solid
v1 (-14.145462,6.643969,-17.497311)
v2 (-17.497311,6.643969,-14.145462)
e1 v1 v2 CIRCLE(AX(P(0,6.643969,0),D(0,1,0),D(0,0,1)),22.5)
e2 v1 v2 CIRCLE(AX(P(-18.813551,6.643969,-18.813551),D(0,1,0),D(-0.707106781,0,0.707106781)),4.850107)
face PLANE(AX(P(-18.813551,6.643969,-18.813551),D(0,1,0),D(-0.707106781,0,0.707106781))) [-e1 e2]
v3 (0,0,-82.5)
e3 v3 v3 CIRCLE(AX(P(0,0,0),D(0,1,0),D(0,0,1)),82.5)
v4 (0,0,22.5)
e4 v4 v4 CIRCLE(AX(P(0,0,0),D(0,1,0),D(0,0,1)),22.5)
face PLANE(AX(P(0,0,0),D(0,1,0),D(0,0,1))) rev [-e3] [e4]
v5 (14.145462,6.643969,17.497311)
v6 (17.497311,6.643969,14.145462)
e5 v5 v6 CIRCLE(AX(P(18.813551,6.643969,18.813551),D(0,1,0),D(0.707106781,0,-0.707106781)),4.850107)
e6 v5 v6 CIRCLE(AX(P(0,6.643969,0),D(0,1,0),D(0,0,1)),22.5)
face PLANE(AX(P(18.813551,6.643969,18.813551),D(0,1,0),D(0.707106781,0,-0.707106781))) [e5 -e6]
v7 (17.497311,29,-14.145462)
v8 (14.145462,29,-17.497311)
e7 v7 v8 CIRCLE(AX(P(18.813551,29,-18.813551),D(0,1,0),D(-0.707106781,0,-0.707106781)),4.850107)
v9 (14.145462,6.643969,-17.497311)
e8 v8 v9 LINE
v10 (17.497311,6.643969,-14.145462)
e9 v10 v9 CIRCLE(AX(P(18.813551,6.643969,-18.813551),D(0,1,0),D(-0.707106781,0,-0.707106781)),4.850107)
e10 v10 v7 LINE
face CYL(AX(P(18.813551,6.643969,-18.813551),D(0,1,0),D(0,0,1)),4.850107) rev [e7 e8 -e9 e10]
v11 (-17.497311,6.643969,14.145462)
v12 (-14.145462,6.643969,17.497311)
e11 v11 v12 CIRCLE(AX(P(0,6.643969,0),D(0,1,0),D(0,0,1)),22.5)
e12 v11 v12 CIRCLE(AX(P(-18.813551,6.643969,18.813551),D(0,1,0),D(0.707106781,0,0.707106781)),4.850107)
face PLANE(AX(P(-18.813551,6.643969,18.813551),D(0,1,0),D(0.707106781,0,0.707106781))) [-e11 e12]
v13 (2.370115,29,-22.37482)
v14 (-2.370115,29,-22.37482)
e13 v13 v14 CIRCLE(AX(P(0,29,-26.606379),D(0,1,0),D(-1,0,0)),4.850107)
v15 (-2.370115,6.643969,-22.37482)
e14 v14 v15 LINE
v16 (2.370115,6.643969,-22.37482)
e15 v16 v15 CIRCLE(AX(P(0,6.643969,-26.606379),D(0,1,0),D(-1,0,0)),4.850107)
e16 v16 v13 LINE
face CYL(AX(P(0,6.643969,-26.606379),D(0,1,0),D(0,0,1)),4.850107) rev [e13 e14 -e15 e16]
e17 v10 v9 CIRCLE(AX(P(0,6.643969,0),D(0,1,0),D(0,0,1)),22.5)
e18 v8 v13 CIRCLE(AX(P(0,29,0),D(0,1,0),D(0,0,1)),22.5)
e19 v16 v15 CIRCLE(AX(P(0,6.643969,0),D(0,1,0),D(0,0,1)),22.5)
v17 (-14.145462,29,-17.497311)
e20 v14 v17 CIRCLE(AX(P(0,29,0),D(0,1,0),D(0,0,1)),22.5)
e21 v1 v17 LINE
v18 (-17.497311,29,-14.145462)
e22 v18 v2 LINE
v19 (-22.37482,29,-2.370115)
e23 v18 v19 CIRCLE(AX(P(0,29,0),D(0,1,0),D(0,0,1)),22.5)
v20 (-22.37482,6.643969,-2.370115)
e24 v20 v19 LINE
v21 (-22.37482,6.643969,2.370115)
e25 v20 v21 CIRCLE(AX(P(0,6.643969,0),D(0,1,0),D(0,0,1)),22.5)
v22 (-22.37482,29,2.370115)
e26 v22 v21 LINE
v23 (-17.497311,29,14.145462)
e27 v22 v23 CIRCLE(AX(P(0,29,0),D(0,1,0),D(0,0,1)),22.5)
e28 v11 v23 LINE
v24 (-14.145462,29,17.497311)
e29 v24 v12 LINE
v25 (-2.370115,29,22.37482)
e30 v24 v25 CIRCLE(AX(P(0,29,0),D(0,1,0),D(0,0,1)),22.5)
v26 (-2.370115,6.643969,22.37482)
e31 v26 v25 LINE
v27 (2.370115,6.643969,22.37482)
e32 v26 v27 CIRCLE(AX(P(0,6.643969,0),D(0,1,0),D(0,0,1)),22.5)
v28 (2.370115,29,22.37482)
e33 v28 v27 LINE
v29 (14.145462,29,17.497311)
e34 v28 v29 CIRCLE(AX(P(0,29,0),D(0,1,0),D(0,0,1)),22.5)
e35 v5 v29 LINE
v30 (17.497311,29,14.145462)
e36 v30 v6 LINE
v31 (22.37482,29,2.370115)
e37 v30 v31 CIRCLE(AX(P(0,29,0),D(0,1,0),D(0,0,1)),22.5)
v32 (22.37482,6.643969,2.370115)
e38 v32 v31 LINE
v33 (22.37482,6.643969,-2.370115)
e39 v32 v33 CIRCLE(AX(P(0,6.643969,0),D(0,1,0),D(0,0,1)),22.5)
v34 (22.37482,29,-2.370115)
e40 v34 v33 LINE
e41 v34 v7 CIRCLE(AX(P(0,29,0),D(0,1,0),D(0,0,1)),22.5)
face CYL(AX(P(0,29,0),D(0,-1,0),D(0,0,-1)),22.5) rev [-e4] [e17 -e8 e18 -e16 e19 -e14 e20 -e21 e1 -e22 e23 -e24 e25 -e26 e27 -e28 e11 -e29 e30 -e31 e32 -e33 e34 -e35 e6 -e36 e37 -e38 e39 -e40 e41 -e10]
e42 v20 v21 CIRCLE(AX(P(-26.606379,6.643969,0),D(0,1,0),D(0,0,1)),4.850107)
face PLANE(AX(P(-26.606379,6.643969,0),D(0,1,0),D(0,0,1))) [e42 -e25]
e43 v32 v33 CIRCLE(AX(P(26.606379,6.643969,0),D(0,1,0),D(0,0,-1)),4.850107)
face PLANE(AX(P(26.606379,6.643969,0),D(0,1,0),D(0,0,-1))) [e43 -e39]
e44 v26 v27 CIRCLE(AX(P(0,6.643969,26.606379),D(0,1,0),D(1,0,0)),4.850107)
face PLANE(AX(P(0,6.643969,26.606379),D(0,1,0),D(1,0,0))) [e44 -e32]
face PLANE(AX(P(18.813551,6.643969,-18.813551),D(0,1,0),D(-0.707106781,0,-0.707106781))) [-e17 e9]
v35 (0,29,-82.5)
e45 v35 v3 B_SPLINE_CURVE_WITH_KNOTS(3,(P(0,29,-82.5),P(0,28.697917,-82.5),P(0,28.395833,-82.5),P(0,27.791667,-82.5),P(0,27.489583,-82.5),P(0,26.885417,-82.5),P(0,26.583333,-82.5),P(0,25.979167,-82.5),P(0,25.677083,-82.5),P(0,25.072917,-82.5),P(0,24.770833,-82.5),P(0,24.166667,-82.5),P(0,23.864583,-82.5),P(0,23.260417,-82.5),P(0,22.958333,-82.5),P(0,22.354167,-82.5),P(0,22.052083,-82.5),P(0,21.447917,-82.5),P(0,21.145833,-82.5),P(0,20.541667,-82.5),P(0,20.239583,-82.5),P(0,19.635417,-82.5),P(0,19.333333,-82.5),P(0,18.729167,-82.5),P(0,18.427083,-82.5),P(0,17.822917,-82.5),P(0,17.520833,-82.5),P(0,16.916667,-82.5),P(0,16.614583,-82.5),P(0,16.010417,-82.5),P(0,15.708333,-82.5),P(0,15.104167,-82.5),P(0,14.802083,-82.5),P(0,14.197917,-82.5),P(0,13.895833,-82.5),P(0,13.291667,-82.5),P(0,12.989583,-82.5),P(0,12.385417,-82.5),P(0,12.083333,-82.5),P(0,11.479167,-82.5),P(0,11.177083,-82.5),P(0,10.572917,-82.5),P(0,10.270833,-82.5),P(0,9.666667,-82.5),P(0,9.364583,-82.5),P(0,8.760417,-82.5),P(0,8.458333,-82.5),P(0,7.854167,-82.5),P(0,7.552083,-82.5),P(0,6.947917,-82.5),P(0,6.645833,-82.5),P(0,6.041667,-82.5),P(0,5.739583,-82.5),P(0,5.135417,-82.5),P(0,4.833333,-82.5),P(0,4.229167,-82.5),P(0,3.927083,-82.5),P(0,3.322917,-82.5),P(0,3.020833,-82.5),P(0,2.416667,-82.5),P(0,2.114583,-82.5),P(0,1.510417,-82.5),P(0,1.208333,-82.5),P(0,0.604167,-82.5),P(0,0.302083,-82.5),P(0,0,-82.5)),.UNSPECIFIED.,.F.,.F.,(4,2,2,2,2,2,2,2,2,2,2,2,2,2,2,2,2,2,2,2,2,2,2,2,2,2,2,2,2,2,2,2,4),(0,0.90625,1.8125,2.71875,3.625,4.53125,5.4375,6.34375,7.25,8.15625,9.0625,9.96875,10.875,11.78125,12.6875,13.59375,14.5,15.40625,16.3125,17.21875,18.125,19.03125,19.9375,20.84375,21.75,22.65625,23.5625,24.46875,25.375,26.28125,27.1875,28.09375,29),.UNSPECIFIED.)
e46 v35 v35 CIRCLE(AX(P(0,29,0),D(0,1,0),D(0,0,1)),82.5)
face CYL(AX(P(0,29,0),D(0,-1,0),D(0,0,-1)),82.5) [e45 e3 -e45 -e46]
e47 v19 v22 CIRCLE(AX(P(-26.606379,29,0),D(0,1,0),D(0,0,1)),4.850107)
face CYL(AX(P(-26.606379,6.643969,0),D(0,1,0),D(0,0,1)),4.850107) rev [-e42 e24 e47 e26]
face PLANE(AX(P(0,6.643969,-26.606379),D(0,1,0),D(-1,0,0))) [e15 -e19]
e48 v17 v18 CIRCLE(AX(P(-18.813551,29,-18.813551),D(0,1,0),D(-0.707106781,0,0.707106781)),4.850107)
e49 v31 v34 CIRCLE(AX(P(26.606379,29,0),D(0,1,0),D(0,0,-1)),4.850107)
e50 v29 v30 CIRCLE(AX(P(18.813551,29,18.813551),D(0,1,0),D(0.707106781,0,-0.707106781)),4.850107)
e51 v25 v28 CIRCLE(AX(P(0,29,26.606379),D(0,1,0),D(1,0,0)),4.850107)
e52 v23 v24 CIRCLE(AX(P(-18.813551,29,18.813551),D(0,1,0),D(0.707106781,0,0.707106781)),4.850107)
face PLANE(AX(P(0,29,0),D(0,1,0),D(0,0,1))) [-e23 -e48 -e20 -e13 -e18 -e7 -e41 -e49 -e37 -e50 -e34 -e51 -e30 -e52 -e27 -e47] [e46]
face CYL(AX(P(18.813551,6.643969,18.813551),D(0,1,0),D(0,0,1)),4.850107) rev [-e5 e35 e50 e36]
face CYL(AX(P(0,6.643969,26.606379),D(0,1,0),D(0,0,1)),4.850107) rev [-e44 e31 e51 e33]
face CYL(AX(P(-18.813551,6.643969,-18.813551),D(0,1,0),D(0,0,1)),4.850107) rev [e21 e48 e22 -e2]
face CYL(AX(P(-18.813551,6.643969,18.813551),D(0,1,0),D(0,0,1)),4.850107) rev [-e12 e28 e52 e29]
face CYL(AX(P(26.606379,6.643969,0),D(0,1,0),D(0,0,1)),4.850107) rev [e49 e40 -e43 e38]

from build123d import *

# Parameters (mm, degrees)
SKETCH1_R           = 82.5
BOSS_EXTRUDE1_DEPTH = 29
SKETCH2_R           = 22.5
CUT_EXTRUDE1_DEPTH  = 121.222710001
SKETCH3_R           = 4.85010726
CUT_EXTRUDE2_DEPTH  = 22.356031406
CIRPATTERN1_COUNT   = 8


with BuildPart() as part:
    # Sketch1 → Boss-Extrude1 (new body)
    with BuildSketch(Plane(origin=(0, 0, 0), x_dir=(1, 0, 0), z_dir=(0, 1, 0))):
        Circle(SKETCH1_R)
    extrude(amount=BOSS_EXTRUDE1_DEPTH)

    # Sketch2 → Cut-Extrude1 (cut, through all)
    with BuildSketch(Plane(origin=(0, 0, 0), x_dir=(1, 0, 0), z_dir=(0, 1, 0))):
        Circle(SKETCH2_R)
    extrude(amount=CUT_EXTRUDE1_DEPTH, mode=Mode.SUBTRACT)

    # Sketch3 → Cut-Extrude2 (cut)
    with BuildSketch(Plane(origin=(0, 29, 0), x_dir=(1, 0, 0), z_dir=(0, 1, 0))):
        with Locations((-26.606378904, 0)):
            Circle(SKETCH3_R)
    cut_extrude2 = extrude(amount=-CUT_EXTRUDE2_DEPTH, mode=Mode.SUBTRACT)

    # CirPattern1: Cut-Extrude2 ×8 about axis
    cirpattern1_axis = Axis((0, 0, 0), (0, 1, 0))
    for i in range(1, CIRPATTERN1_COUNT):
        add(cut_extrude2.rotate(cirpattern1_axis, i * 360 / CIRPATTERN1_COUNT), mode=Mode.SUBTRACT)


solid = part.part
